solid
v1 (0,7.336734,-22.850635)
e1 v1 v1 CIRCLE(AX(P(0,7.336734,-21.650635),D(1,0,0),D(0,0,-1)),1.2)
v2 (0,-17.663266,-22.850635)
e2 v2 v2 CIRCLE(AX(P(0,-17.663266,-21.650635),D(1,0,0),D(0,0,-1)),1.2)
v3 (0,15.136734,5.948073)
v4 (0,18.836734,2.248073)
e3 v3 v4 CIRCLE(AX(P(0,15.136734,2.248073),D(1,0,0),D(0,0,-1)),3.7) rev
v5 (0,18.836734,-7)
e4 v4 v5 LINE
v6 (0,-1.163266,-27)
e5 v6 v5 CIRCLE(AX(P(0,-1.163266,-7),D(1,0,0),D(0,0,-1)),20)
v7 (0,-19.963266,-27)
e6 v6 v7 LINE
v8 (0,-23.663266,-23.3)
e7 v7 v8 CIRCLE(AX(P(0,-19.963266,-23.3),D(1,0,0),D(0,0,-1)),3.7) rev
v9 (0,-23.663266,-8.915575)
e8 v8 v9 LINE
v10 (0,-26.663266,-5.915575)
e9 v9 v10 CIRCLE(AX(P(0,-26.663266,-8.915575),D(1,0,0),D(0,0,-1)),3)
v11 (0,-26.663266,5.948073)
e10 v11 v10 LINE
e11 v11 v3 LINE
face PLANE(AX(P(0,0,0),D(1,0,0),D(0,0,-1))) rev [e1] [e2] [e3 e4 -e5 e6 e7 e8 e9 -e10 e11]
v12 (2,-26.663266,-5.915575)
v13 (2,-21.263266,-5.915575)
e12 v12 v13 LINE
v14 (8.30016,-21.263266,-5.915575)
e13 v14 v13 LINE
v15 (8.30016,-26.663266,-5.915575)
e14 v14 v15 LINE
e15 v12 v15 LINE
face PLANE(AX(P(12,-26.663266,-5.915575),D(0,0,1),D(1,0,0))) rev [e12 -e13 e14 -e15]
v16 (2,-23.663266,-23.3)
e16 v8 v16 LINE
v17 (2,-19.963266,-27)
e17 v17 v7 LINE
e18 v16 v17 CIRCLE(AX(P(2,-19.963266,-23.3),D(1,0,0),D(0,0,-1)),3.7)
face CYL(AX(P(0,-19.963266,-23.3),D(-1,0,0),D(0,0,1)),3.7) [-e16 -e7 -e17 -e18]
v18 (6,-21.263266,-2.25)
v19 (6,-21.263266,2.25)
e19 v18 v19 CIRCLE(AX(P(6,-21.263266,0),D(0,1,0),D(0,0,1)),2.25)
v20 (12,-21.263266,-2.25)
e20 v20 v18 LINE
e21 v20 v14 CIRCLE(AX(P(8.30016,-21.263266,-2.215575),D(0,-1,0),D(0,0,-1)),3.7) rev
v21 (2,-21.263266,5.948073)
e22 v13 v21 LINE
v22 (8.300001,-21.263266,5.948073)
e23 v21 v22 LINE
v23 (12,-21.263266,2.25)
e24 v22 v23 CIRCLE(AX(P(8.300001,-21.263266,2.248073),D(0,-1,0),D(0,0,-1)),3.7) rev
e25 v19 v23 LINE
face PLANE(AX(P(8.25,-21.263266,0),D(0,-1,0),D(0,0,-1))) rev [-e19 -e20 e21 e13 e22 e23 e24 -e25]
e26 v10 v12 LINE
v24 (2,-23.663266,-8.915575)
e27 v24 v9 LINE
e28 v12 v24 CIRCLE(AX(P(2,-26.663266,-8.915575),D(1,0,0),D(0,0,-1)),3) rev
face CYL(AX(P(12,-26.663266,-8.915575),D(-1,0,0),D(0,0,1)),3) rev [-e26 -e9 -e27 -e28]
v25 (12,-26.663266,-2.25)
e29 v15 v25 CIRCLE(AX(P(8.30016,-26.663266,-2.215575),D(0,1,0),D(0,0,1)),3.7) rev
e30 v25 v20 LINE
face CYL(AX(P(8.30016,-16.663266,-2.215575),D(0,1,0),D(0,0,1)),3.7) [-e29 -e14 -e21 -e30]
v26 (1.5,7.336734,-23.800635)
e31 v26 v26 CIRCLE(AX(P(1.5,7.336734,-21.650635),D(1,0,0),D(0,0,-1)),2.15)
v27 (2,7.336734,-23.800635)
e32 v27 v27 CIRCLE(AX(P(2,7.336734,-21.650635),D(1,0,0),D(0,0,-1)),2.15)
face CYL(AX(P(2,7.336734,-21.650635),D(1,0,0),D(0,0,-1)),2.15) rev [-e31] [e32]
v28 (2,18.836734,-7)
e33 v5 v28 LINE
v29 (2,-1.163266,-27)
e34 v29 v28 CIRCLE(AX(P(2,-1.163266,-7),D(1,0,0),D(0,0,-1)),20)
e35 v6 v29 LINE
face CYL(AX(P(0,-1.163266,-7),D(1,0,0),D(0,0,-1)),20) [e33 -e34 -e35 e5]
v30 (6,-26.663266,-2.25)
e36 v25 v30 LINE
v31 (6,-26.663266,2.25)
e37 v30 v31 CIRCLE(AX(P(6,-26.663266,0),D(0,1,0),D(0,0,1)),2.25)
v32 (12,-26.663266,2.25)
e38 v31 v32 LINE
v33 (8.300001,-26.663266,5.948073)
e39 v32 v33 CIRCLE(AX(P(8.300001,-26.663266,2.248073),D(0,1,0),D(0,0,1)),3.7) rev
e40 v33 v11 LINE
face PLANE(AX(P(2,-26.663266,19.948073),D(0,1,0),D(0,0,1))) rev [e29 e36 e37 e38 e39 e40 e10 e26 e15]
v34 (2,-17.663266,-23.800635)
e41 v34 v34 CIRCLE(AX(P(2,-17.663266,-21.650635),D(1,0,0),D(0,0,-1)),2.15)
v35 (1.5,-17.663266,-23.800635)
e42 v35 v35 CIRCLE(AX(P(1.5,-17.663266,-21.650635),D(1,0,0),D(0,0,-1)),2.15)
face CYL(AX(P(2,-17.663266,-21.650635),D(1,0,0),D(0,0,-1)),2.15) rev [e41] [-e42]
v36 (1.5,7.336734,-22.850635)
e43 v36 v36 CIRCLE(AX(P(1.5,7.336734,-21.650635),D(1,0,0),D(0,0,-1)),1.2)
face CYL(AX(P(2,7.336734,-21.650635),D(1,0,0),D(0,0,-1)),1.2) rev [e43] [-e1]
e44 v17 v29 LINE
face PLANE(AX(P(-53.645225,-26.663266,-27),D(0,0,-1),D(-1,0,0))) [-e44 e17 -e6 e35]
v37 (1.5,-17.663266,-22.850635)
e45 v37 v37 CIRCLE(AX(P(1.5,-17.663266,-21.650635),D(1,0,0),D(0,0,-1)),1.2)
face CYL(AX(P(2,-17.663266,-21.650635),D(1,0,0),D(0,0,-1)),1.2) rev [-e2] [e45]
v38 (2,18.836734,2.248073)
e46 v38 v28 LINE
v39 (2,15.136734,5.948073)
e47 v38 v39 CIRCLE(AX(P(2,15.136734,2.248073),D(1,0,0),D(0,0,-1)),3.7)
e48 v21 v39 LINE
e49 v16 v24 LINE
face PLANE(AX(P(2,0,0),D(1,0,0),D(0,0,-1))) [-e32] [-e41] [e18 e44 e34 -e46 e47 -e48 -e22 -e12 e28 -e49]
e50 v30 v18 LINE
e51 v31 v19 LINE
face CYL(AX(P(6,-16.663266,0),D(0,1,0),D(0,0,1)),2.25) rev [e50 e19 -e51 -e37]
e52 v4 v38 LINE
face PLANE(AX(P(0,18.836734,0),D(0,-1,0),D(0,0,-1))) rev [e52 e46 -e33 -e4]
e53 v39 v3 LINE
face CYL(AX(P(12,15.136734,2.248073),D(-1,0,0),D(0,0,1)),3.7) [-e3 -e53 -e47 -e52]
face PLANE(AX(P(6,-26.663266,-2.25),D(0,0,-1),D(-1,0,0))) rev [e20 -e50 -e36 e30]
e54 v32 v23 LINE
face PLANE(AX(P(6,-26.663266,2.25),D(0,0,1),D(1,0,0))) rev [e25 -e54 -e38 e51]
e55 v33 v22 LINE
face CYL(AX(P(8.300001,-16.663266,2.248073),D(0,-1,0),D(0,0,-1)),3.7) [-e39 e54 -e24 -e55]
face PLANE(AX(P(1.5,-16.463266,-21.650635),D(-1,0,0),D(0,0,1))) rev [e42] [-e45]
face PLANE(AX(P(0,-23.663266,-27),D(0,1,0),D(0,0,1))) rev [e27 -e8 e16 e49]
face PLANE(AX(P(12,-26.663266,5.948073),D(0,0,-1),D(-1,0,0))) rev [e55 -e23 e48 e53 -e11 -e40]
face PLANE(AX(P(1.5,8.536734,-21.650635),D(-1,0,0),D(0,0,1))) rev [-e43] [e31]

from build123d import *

# Parameters (mm, degrees)
SKETCH_1_W                = 39.896146096
SKETCH_1_H                = 53.32653191
EXTRUDE_1_DEPTH           = 2
SKETCH_2_W                = 12
SKETCH_2_H                = 39.863647893
EXTRUDE_2_DEPTH           = 10
HOLE_WIZARD_1_D           = 4.5
HOLE_WIZARD_1_CBORE_D     = 8
HOLE_WIZARD_1_CBORE_DEPTH = 4.6
SKETCH_6_W                = 10
SKETCH_6_H                = 14
CUT_EXTRUDE_1_DEPTH       = 50.184489279
SKETCH_8_W                = 7.051926952
SKETCH_8_H                = 53.179699591
EXTRUDE_3_DEPTH           = 2
CUT_EXTRUDE_2_DEPTH       = 40.24193868
HOLE_WIZARD_2_D           = 2.4
HOLE_WIZARD_2_CBORE_D     = 4.3
HOLE_WIZARD_2_CBORE_DEPTH = 0.5
SKETCH_12_W               = 21.084425155
SKETCH_12_H               = 3
CUT_EXTRUDE_3_DEPTH       = 40.24193868
FILLET_1_R                = 3
SKETCH_13_W               = 15.522379956
SKETCH_13_H               = 43.706267889
CUT_EXTRUDE_4_DEPTH       = 40.24193868
SKETCH_14_W               = 6
SKETCH_14_H               = 11.863647893
CUT_EXTRUDE_5_DEPTH       = 4.6
SKETCH_15_W               = 6
SKETCH_15_H               = 4.5
CUT_EXTRUDE_6_DEPTH       = 50.809738004
FILLET_2_R                = 3.7
FILLET_3_R                = 3.7
SKETCH_17_W               = 11.863647893
SKETCH_17_H               = 4.6
CUT_EXTRUDE_7_DEPTH       = 4


# Some blends are built 0.0001 mm under size
with BuildPart() as part:
    # 草图1 → 凸台-拉伸1 (new body)
    with BuildSketch(Plane(origin=(0, 0, 0), x_dir=(0, 0, -1), z_dir=(1, 0, 0))):
        Rectangle(SKETCH_1_W, SKETCH_1_H)
    extrude(amount=EXTRUDE_1_DEPTH)

    # 草图2 → 凸台-拉伸2 (add)
    with BuildSketch(Plane.XZ.offset(26.663265955)):
        with Locations((6, 0.016249101)):
            Rectangle(SKETCH_2_W, SKETCH_2_H)
    extrude(amount=-EXTRUDE_2_DEPTH)

    # 打孔尺寸(%根据)内六角圆柱头螺钉的类型1 (through all)
    with Locations(Plane(origin=(6, -16.663265955, 0), x_dir=(0, 0, 1), z_dir=(0, 1, 0))):
        with Locations((0, 0)):
            CounterBoreHole(HOLE_WIZARD_1_D / 2, HOLE_WIZARD_1_CBORE_D / 2, HOLE_WIZARD_1_CBORE_DEPTH)

    # 草图6 → 切除-拉伸1 (cut, through all)
    with BuildSketch(Plane(origin=(0, -16.663265955, 0), x_dir=(1, 0, 0), z_dir=(0, 1, 0))):
        with Locations((7, 12.915574845)):
            Rectangle(SKETCH_6_W, SKETCH_6_H)
        with Locations((7, -12.948073048)):
            Rectangle(SKETCH_6_W, SKETCH_6_H)
    extrude(amount=-CUT_EXTRUDE_1_DEPTH, mode=Mode.SUBTRACT)

    # 草图8 → 凸台-拉伸3 (add)
    with BuildSketch(Plane(origin=(2, 0, 0), x_dir=(0, 0, -1), z_dir=(1, 0, 0))):
        with Locations((23.474036524, -0.073416159)):
            Rectangle(SKETCH_8_W, SKETCH_8_H)
    extrude(amount=-EXTRUDE_3_DEPTH)

    # 草图9 → 切除-拉伸2 (cut, through all)
    with BuildSketch(Plane(origin=(2, 0, 0), x_dir=(0, 0, -1), z_dir=(1, 0, 0))):
        with BuildLine():
            ThreePointArc((-10.54, 13.836734045), (-9.075533906, 17.372267951), (-5.54, 18.836734045))
            Line((-5.54, 18.836734045), (7, 18.836734045))
            ThreePointArc((7, 18.836734045), (21.142135624, 12.978869669), (27, -1.163265955))
            Line((27, -1.163265955), (27, 26.516433636))
            Line((27, 26.516433636), (19.948073048, 26.516433636))
            Line((19.948073048, 26.516433636), (19.948073048, 26.663265955))
            Line((19.948073048, 26.663265955), (-19.948073048, 26.663265955))
            Line((-19.948073048, 26.663265955), (-19.948073048, -3.722994561))
            ThreePointArc((-19.948073048, -3.722994561), (-17.113911838, 5.186324453), (-10.54, 11.834039714))
            Line((-10.54, 11.834039714), (-10.54, 13.836734045))
        make_face()
        with BuildLine():
            ThreePointArc((-5.948073048, -24.258302666), (-15.670841721, -17.590040264), (-19.948073048, -6.603537348))
            Line((-19.948073048, -6.603537348), (-19.948073048, -26.663265955))
            Line((-19.948073048, -26.663265955), (-5.948073048, -26.663265955))
            Line((-5.948073048, -26.663265955), (-5.948073048, -24.258302666))
        make_face()
    extrude(amount=-CUT_EXTRUDE_2_DEPTH, mode=Mode.SUBTRACT)

    # 打孔尺寸(%根据)内六角圆柱头螺钉的类型2 (through all)
    with Locations(Plane(origin=(2, 7.336734045, -21.650635095), x_dir=(0, 0, 1), z_dir=(1, 0, 0))):
        with Locations((0, 0), (0, 25)):
            CounterBoreHole(HOLE_WIZARD_2_D / 2, HOLE_WIZARD_2_CBORE_D / 2, HOLE_WIZARD_2_CBORE_DEPTH)

    # 草图12 → 切除-拉伸3 (cut, through all)
    with BuildSketch(Plane(origin=(2, 0, 0), x_dir=(0, 0, -1), z_dir=(1, 0, 0))):
        with Locations((16.457787423, -25.163265955)):
            Rectangle(SKETCH_12_W, SKETCH_12_H)
    extrude(amount=-CUT_EXTRUDE_3_DEPTH, mode=Mode.SUBTRACT)

    # 圆角1
    fillet_1_edges = [part.edges().sort_by_distance(p)[0] for p in [
        (1, -23.663265955, -5.915574845),
    ]]
    fillet(fillet_1_edges, radius=FILLET_1_R - 0.0001)  # a hair under: the kernel refuses the full size

    # 草图13 → 切除-拉伸4 (cut, through all)
    with BuildSketch(Plane(origin=(2, 0, 0), x_dir=(0, 0, -1), z_dir=(1, 0, 0))):
        with Locations((-13.709263026, -2.405168722)):
            Rectangle(SKETCH_13_W, SKETCH_13_H)
    extrude(amount=-CUT_EXTRUDE_4_DEPTH, mode=Mode.SUBTRACT)

    # 草图14 → 切除-拉伸5 (cut)
    with BuildSketch(Plane(origin=(0, -16.663265955, 0), x_dir=(1, 0, 0), z_dir=(0, 1, 0))):
        with Locations((9, -0.016249102)):
            Rectangle(SKETCH_14_W, SKETCH_14_H)
    extrude(amount=-CUT_EXTRUDE_5_DEPTH, mode=Mode.SUBTRACT)

    # 草图15 → 切除-拉伸6 (cut, through all)
    with BuildSketch(Plane(origin=(0, -21.263265955, 0), x_dir=(1, 0, 0), z_dir=(0, 1, 0))):
        with Locations((9, 0)):
            Rectangle(SKETCH_15_W, SKETCH_15_H)
    extrude(amount=-CUT_EXTRUDE_6_DEPTH, mode=Mode.SUBTRACT)

    # 圆角2
    # the kernel refuses this fillet: 3.7 mm, written as the material it takes off along each edge
    with BuildSketch(Plane(origin=(12, -12.013265955, -5.915574845), x_dir=(-1, 0, 0), z_dir=(0, -1, 0))) as fillet_2_piece_1:
        with BuildLine():
            CenterArc((FILLET_2_R, -FILLET_2_R), FILLET_2_R, 90, 90)
            Line((0, -FILLET_2_R), (0, 0))
            Line((0, 0), (FILLET_2_R, 0))
        make_face()
    extrude(amount=23.9, mode=Mode.SUBTRACT)
    with BuildSketch(Plane(origin=(12, -12.013265955, 5.948073048), x_dir=(-1, 0, 0), z_dir=(0, -1, 0))) as fillet_2_piece_2:
        with BuildLine():
            CenterArc((FILLET_2_R, FILLET_2_R), FILLET_2_R, 180, 90)
            Line((0, FILLET_2_R), (0, 0))
            Line((0, 0), (FILLET_2_R, 0))
        make_face()
    extrude(amount=23.9, mode=Mode.SUBTRACT)

    # 圆角3
    # the kernel refuses this fillet: 3.7 mm, written as the material it takes off along each edge
    with BuildSketch(Plane(origin=(11.25, -23.663265955, -27), x_dir=(0, 1, 0), z_dir=(-1, 0, 0))) as fillet_3_piece_1:
        with BuildLine():
            CenterArc((FILLET_3_R, -FILLET_3_R), FILLET_3_R, 90, 90)
            Line((0, -FILLET_3_R), (0, 0))
            Line((0, 0), (FILLET_3_R, 0))
        make_face()
    extrude(amount=20.5, mode=Mode.SUBTRACT)
    with BuildSketch(Plane(origin=(-9.250093996, 18.820053861, 5.948073048), x_dir=(0, -1, 0), z_dir=(1, 0, 0))) as fillet_3_piece_2:
        with BuildLine():
            CenterArc((3.683319816, 3.7), FILLET_3_R, 180, 90)
            Line((-0.016680184, 3.7), (-0.386680184, 3.7))
            ThreePointArc((-0.386680184, 3.7), (-0.386680184, 0.408073048), (-0.368765666, -0.030197406))
            Line((-0.368765666, -0.030197406), (0, -0.37))
            Line((0, -0.37), (3.683319816, -0.37))
            Line((3.683319816, -0.37), (3.683319816, 0))
        make_face()
    extrude(amount=20.500187991, mode=Mode.SUBTRACT)

    # 草图17 → 切除-拉伸7 (cut)
    with BuildSketch(Plane(origin=(6, 0, 0), x_dir=(0, 0, -1), z_dir=(1, 0, 0))):
        with Locations((-0.016249102, -18.963265955)):
            Rectangle(SKETCH_17_W, SKETCH_17_H)
    extrude(amount=-CUT_EXTRUDE_7_DEPTH, mode=Mode.SUBTRACT)


solid = part.part
